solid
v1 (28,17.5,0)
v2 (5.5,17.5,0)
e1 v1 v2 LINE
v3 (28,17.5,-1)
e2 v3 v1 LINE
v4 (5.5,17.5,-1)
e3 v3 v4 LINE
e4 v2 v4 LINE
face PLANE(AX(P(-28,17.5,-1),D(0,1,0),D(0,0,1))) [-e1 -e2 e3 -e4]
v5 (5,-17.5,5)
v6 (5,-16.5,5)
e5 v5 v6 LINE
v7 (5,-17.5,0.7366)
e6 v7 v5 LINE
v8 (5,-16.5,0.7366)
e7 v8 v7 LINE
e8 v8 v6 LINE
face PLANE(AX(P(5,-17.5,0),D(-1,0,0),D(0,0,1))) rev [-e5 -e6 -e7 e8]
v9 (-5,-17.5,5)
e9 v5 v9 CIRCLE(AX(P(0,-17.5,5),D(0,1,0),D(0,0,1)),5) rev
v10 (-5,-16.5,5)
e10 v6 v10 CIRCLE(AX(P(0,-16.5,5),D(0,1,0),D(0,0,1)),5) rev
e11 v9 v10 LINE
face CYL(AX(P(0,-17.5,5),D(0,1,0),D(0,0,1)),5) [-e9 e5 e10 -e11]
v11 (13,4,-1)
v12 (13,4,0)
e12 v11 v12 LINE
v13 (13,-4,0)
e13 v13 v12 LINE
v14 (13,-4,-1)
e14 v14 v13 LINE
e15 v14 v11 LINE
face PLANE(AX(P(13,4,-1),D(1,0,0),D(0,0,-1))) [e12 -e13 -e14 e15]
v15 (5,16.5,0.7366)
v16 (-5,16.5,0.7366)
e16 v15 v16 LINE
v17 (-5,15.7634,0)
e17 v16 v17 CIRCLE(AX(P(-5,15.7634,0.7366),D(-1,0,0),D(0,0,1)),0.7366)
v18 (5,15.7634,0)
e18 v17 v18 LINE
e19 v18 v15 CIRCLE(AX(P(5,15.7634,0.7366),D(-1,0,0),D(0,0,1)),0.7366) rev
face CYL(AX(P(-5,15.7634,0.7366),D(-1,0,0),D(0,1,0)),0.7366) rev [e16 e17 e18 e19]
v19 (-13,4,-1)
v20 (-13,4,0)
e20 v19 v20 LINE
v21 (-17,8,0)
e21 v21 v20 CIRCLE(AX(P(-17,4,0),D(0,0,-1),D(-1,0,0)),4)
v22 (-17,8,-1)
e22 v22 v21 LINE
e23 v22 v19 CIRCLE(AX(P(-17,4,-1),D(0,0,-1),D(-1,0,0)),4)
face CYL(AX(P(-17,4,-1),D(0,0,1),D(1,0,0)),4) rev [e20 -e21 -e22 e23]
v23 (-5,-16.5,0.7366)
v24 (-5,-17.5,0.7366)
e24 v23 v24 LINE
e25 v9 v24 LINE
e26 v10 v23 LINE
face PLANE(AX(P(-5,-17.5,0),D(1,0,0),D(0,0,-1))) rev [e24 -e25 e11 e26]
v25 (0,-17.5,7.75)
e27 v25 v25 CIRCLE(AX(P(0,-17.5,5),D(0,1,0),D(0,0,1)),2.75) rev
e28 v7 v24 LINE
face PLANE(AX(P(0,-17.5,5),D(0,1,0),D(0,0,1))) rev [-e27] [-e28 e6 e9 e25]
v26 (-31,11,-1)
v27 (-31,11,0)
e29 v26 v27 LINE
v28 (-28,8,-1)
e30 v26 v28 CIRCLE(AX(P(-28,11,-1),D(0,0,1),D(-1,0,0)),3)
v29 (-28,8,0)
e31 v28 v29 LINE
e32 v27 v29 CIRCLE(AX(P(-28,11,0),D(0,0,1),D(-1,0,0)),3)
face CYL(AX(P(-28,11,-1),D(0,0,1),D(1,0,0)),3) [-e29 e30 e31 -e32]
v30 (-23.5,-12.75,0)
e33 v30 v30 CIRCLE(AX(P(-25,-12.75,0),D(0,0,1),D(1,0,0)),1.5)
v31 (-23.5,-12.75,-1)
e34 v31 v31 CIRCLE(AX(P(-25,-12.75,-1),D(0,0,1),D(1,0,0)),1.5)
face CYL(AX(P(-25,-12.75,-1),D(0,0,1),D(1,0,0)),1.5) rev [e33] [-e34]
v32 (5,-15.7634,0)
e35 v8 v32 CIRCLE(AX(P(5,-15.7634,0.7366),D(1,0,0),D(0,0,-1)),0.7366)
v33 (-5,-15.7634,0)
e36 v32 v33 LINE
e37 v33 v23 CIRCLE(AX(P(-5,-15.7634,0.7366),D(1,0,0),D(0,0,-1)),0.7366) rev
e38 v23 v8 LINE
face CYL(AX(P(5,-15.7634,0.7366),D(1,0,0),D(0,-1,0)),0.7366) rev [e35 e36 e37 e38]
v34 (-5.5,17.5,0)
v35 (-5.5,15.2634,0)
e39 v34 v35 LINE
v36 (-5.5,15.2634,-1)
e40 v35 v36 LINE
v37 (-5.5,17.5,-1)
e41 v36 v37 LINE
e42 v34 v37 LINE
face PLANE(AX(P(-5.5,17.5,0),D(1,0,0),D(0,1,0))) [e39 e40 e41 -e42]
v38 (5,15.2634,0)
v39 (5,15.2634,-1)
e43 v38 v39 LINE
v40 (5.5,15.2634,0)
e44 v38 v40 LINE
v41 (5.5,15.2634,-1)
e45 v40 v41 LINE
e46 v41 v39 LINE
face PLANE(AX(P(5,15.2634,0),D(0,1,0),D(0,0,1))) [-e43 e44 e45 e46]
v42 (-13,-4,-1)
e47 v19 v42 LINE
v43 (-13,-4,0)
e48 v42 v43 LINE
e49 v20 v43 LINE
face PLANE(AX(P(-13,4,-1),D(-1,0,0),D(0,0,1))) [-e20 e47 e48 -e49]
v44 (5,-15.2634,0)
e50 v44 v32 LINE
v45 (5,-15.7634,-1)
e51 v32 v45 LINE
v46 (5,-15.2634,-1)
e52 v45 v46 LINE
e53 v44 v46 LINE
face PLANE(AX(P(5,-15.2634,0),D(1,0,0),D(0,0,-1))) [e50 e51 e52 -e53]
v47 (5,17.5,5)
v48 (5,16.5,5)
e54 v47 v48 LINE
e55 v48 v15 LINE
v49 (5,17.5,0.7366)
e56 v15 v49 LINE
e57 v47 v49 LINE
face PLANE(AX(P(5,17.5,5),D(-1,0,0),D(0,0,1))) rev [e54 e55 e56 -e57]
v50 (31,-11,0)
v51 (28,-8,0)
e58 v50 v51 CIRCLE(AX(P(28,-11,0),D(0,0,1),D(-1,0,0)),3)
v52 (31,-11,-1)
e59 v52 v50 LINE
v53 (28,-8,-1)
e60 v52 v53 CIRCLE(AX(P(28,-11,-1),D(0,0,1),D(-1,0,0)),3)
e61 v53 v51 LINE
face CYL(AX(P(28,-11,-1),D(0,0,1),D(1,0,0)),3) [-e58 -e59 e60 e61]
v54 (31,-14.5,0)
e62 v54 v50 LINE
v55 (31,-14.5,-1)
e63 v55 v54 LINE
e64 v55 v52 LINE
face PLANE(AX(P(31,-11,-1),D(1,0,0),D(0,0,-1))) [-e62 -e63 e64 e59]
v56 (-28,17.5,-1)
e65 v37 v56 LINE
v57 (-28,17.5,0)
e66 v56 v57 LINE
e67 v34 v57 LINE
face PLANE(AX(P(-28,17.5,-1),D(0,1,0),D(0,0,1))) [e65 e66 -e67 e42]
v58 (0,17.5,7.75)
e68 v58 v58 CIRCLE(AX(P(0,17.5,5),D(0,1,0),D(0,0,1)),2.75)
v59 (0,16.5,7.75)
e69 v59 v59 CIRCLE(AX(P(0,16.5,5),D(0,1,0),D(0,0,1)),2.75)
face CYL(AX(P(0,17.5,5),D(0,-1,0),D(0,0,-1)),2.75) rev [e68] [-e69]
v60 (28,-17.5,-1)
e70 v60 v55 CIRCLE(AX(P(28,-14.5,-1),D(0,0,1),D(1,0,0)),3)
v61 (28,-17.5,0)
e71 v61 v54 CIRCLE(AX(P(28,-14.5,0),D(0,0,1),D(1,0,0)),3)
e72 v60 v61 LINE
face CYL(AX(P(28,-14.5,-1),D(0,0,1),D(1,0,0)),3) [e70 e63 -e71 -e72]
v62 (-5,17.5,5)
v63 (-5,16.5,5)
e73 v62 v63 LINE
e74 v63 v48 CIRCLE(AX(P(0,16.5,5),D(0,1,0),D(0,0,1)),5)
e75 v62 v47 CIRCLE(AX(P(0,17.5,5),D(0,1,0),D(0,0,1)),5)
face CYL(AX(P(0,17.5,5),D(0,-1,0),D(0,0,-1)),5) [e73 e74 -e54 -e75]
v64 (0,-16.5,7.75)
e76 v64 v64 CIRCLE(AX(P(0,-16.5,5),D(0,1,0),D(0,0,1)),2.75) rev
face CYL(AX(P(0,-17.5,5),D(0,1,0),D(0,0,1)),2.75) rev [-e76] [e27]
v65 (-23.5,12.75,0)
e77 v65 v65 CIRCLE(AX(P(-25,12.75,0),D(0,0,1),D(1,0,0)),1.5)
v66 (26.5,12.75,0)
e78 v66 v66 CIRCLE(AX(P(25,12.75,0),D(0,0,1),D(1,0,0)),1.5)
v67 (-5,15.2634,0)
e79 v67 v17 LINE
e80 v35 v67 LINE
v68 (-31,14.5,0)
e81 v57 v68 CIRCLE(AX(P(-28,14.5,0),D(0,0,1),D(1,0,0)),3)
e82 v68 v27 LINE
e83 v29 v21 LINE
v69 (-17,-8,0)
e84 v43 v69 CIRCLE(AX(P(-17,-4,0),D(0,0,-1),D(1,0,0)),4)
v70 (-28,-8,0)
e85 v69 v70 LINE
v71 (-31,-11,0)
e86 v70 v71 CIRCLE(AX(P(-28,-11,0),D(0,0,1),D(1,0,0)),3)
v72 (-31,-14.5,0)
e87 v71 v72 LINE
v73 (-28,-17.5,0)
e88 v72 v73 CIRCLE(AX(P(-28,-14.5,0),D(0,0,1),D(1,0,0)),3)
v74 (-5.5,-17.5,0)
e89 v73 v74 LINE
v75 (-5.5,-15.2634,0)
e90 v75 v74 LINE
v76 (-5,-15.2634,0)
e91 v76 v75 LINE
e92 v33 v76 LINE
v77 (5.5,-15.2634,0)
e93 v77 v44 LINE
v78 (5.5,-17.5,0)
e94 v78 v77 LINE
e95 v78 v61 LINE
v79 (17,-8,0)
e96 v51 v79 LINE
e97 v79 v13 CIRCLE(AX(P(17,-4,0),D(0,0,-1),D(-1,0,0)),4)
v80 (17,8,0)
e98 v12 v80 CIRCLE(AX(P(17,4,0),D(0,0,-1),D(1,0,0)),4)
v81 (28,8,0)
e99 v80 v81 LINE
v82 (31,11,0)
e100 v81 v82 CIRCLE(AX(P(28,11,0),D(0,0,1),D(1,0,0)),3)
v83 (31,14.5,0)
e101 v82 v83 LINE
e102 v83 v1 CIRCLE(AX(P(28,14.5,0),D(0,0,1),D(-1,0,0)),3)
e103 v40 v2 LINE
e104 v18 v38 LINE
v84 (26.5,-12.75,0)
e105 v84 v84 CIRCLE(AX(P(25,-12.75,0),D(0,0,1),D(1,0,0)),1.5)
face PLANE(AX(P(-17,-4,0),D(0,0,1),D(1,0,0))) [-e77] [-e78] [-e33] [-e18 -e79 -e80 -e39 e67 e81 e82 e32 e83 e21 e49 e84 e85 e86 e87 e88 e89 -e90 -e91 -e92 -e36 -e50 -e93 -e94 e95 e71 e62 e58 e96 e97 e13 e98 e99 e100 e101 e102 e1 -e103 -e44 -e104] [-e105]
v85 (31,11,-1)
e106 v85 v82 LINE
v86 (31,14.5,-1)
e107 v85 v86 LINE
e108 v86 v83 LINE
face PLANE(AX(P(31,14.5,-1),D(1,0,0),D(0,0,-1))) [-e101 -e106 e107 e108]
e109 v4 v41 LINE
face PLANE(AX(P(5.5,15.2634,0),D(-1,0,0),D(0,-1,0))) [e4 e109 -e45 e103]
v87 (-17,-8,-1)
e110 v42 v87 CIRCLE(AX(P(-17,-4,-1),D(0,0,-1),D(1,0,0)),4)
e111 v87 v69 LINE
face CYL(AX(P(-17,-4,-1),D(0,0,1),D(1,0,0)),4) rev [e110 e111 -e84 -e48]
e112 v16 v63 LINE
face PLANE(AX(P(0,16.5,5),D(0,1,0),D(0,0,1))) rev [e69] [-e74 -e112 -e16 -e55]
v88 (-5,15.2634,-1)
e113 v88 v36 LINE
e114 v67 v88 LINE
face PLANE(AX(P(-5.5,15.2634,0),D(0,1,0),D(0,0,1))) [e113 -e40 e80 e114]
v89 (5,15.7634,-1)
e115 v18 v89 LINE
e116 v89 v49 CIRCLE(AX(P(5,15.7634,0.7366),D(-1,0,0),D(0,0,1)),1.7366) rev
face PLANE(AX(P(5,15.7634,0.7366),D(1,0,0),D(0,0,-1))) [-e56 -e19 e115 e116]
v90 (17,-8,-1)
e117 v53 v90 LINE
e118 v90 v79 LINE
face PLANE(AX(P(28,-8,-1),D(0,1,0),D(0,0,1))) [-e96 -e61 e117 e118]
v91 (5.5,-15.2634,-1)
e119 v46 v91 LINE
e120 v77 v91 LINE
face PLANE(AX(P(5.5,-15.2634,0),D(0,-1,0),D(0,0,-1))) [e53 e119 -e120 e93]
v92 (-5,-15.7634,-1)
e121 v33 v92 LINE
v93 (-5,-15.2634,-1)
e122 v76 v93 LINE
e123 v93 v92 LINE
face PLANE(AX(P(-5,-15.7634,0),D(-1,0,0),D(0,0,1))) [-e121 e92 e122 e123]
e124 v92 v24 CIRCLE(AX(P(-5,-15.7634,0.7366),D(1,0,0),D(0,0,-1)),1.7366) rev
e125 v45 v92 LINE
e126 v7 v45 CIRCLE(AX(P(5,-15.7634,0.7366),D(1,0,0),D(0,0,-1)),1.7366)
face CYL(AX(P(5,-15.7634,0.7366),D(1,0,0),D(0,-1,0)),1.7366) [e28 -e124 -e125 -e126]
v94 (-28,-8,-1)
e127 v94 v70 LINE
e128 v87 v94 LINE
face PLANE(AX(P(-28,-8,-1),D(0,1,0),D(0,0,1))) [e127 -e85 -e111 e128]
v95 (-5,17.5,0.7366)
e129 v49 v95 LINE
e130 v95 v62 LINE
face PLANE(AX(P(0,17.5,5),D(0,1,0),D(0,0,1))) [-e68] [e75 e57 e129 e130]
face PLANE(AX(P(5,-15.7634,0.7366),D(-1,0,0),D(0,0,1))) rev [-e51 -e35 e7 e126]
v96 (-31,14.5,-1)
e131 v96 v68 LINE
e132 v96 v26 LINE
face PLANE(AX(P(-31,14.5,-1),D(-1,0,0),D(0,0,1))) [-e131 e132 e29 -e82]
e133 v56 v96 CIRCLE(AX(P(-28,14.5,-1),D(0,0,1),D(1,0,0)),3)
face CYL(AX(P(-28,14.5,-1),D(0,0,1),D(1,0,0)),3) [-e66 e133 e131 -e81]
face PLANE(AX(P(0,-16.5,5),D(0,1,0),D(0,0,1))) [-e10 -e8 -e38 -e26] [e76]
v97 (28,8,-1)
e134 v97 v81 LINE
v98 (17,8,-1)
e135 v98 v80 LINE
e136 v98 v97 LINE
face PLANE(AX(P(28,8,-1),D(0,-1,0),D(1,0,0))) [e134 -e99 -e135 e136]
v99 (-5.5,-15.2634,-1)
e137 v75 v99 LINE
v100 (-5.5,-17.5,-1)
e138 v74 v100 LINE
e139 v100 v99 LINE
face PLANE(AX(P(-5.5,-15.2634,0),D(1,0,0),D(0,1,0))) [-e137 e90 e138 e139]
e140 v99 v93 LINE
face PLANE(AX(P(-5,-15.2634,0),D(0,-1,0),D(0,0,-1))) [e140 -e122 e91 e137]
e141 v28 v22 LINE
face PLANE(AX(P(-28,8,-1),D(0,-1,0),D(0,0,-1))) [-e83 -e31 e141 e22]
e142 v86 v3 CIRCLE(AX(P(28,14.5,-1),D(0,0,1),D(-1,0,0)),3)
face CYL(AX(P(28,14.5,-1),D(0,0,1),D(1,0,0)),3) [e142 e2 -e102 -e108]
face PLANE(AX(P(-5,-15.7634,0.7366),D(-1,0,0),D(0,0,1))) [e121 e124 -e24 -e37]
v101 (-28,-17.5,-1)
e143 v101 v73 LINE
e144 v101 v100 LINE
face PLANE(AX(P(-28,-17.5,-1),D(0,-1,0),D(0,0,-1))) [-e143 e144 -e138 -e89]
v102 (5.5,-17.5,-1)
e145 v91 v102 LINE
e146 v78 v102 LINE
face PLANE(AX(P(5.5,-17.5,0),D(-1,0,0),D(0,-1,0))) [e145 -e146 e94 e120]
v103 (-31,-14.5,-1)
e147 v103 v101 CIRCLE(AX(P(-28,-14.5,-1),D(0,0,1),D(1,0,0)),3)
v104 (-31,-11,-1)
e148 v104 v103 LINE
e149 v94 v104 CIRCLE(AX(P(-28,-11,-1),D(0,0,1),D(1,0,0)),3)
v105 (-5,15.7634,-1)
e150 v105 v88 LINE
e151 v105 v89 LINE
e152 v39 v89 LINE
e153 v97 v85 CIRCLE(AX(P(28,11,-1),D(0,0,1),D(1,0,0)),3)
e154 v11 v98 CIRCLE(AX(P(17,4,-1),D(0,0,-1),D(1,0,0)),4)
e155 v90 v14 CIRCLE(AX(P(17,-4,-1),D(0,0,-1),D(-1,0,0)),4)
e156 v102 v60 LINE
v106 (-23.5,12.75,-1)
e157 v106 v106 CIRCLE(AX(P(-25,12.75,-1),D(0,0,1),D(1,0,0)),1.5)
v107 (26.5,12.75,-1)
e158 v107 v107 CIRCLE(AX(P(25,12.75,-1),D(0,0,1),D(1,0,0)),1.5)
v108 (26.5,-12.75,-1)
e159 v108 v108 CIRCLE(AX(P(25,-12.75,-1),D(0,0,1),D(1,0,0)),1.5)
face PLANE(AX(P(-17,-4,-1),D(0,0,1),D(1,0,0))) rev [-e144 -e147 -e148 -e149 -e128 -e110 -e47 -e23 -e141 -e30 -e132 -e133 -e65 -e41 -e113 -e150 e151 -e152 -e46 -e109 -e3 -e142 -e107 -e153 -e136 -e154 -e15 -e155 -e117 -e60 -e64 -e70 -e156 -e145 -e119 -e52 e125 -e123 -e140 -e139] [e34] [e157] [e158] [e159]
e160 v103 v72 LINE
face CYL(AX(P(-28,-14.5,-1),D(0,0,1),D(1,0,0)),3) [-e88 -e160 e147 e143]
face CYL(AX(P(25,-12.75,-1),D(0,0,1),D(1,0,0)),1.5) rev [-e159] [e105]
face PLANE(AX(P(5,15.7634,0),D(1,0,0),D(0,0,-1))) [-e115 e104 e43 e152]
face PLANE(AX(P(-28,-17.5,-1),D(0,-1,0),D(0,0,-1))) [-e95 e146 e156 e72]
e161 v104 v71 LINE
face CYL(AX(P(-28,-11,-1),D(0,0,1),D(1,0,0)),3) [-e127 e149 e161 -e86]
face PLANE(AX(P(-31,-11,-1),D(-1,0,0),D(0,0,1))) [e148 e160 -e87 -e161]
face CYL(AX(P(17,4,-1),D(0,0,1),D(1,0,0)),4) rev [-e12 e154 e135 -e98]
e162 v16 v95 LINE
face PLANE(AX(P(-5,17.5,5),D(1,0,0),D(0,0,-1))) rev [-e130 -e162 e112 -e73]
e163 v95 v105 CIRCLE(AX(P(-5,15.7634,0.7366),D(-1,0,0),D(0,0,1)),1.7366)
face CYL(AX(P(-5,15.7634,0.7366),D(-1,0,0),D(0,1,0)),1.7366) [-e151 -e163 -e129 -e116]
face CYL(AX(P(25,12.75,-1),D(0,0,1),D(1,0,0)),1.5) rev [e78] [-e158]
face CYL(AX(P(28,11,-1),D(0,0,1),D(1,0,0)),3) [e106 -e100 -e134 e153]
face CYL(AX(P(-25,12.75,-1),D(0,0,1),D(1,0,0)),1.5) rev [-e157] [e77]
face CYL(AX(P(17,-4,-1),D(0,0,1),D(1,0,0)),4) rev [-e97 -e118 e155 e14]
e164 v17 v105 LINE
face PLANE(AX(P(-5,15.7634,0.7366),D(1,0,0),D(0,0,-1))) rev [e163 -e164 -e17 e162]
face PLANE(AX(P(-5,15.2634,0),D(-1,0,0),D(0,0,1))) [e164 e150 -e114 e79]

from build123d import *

# Parameters (mm, degrees)
SKETCH1_R                     = 1.5
BASE_FLANGE1_DEPTH            = 1
EDGE_FLANGE1_STRIP_W          = 5.4732
EDGE_FLANGE1_STRIP_H          = 1
EDGE_FLANGE1_STRIP_CUT_DEPTH  = 10
EDGE_FLANGE1_RELIEF_W         = 5.9732
EDGE_FLANGE1_RELIEF_H         = 0.5
EDGE_FLANGE1_RELIEF_CUT_DEPTH = 1
EDGE_FLANGE1_DEPTH            = 10
EDGE_FLANGE1_PROFILE_R        = 2.75
EDGE_FLANGE1_FLAT_DEPTH       = 1
EDGE_FLANGE2_STRIP_W          = 5.4732
EDGE_FLANGE2_STRIP_H          = 1
EDGE_FLANGE2_STRIP_CUT_DEPTH  = 10
EDGE_FLANGE2_RELIEF_W         = 5.9732
EDGE_FLANGE2_RELIEF_H         = 0.5
EDGE_FLANGE2_RELIEF_CUT_DEPTH = 1
EDGE_FLANGE2_DEPTH            = 10
EDGE_FLANGE2_PROFILE_R        = 2.75
EDGE_FLANGE2_FLAT_DEPTH       = 1


# Sheet-metal steps are written as plain solids
with BuildPart() as part:
    # Sketch1 → Base-Flange1 (new body)
    with BuildSketch(Plane.XY):
        with BuildLine():
            Line((-28, 8), (-17, 8))
            ThreePointArc((-17, 8), (-14.171572875, 6.828427125), (-13, 4))
            Line((-13, 4), (-13, -4))
            ThreePointArc((-13, -4), (-14.171572875, -6.828427125), (-17, -8))
            Line((-17, -8), (-28, -8))
            ThreePointArc((-28, -8), (-30.121320344, -8.878679656), (-31, -11))
            Line((-31, -11), (-31, -14.5))
            ThreePointArc((-31, -14.5), (-30.121320344, -16.621320344), (-28, -17.5))
            Line((-28, -17.5), (28, -17.5))
            ThreePointArc((28, -17.5), (30.121320344, -16.621320344), (31, -14.5))
            Line((31, -14.5), (31, -11))
            ThreePointArc((31, -11), (30.121320344, -8.878679656), (28, -8))
            Line((28, -8), (17, -8))
            ThreePointArc((17, -8), (14.171572875, -6.828427125), (13, -4))
            Line((13, -4), (13, 4))
            ThreePointArc((13, 4), (14.171572875, 6.828427125), (17, 8))
            Line((17, 8), (28, 8))
            ThreePointArc((28, 8), (30.121320344, 8.878679656), (31, 11))
            Line((31, 11), (31, 14.5))
            ThreePointArc((31, 14.5), (30.121320344, 16.621320344), (28, 17.5))
            Line((28, 17.5), (-28, 17.5))
            ThreePointArc((-28, 17.5), (-30.121320344, 16.621320344), (-31, 14.5))
            Line((-31, 14.5), (-31, 11))
            ThreePointArc((-31, 11), (-30.121320344, 8.878679656), (-28, 8))
        make_face()
        with Locations((-25, 12.75)):
            Circle(SKETCH1_R, mode=Mode.SUBTRACT)
        with Locations((25, 12.75)):
            Circle(SKETCH1_R, mode=Mode.SUBTRACT)
        with Locations((25, -12.75)):
            Circle(SKETCH1_R, mode=Mode.SUBTRACT)
        with Locations((-25, -12.75)):
            Circle(SKETCH1_R, mode=Mode.SUBTRACT)
    extrude(amount=-BASE_FLANGE1_DEPTH)

    # Edge-Flange1 strip (across the edge) → Edge-Flange1 strip cut (cut)
    with BuildSketch(Plane(origin=(5, 17.5, 0), x_dir=(0, -1, 0), z_dir=(-1, 0, 0))):
        with Locations((-1, -0.5)):
            Rectangle(EDGE_FLANGE1_STRIP_W, EDGE_FLANGE1_STRIP_H)
    extrude(amount=EDGE_FLANGE1_STRIP_CUT_DEPTH, mode=Mode.SUBTRACT)

    # Edge-Flange1 relief (on the sheet) → Edge-Flange1 relief cut (cut)
    with BuildSketch(Plane(origin=(5, 15.7634, 0), x_dir=(0, -1, 0), z_dir=(0, 0, 1))):
        with Locations((-2.4866, 0.25)):
            Rectangle(EDGE_FLANGE1_RELIEF_W, EDGE_FLANGE1_RELIEF_H)
        with Locations((-2.4866, -10.25)):
            Rectangle(EDGE_FLANGE1_RELIEF_W, EDGE_FLANGE1_RELIEF_H)
    extrude(amount=-EDGE_FLANGE1_RELIEF_CUT_DEPTH, mode=Mode.SUBTRACT)

    # Edge-Flange1 bend section (across the edge) → Edge-Flange1 (add)
    with BuildSketch(Plane(origin=(5, 17.5, 0), x_dir=(0, -1, 0), z_dir=(-1, 0, 0))):
        with BuildLine():
            Line((0, 0.7366), (1, 0.7366))
            ThreePointArc((1, 0.7366), (1.215745145, 0.215745145), (1.7366, 0))
            Line((1.7366, 0), (1.7366, -1))
            ThreePointArc((1.7366, -1), (0.508638364, -0.491361636), (0, 0.7366))
        make_face()
    extrude(amount=EDGE_FLANGE1_DEPTH)

    # Edge-Flange1 profile (on flange) → Edge-Flange1 flat (add)
    with BuildSketch(Plane(origin=(0, 17.5, 0), x_dir=(-1, 0, 0), z_dir=(0, 1, 0))):
        with BuildLine():
            Line((-5, 5), (-5, 0.7366))
            Line((-5, 0.7366), (5, 0.7366))
            Line((5, 0.7366), (5, 5))
            ThreePointArc((5, 5), (0, 10), (-5, 5))
        make_face()
        with Locations((0, 5)):
            Circle(EDGE_FLANGE1_PROFILE_R, mode=Mode.SUBTRACT)
    extrude(amount=-EDGE_FLANGE1_FLAT_DEPTH)

    # Edge-Flange2 strip (across the edge) → Edge-Flange2 strip cut (cut)
    with BuildSketch(Plane(origin=(-5, -17.5, 0), x_dir=(0, 1, 0), z_dir=(1, 0, 0))):
        with Locations((-1, -0.5)):
            Rectangle(EDGE_FLANGE2_STRIP_W, EDGE_FLANGE2_STRIP_H)
    extrude(amount=EDGE_FLANGE2_STRIP_CUT_DEPTH, mode=Mode.SUBTRACT)

    # Edge-Flange2 relief (on the sheet) → Edge-Flange2 relief cut (cut)
    with BuildSketch(Plane(origin=(-5, -15.7634, 0), x_dir=(0, 1, 0), z_dir=(0, 0, 1))):
        with Locations((-2.4866, 0.25)):
            Rectangle(EDGE_FLANGE2_RELIEF_W, EDGE_FLANGE2_RELIEF_H)
        with Locations((-2.4866, -10.25)):
            Rectangle(EDGE_FLANGE2_RELIEF_W, EDGE_FLANGE2_RELIEF_H)
    extrude(amount=-EDGE_FLANGE2_RELIEF_CUT_DEPTH, mode=Mode.SUBTRACT)

    # Edge-Flange2 bend section (across the edge) → Edge-Flange2 (add)
    with BuildSketch(Plane(origin=(-5, -17.5, 0), x_dir=(0, 1, 0), z_dir=(1, 0, 0))):
        with BuildLine():
            Line((0, 0.7366), (1, 0.7366))
            ThreePointArc((1, 0.7366), (1.215745145, 0.215745145), (1.7366, 0))
            Line((1.7366, 0), (1.7366, -1))
            ThreePointArc((1.7366, -1), (0.508638364, -0.491361636), (0, 0.7366))
        make_face()
    extrude(amount=EDGE_FLANGE2_DEPTH)

    # Edge-Flange2 profile (on flange) → Edge-Flange2 flat (add)
    with BuildSketch(Plane.XZ.offset(17.5)):
        with BuildLine():
            ThreePointArc((5, 5), (0, 10), (-5, 5))
            Line((-5, 5), (-5, 0.7366))
            Line((-5, 0.7366), (5, 0.7366))
            Line((5, 0.7366), (5, 5))
        make_face()
        with Locations((0, 5)):
            Circle(EDGE_FLANGE2_PROFILE_R, mode=Mode.SUBTRACT)
    extrude(amount=-EDGE_FLANGE2_FLAT_DEPTH)


solid = part.part
